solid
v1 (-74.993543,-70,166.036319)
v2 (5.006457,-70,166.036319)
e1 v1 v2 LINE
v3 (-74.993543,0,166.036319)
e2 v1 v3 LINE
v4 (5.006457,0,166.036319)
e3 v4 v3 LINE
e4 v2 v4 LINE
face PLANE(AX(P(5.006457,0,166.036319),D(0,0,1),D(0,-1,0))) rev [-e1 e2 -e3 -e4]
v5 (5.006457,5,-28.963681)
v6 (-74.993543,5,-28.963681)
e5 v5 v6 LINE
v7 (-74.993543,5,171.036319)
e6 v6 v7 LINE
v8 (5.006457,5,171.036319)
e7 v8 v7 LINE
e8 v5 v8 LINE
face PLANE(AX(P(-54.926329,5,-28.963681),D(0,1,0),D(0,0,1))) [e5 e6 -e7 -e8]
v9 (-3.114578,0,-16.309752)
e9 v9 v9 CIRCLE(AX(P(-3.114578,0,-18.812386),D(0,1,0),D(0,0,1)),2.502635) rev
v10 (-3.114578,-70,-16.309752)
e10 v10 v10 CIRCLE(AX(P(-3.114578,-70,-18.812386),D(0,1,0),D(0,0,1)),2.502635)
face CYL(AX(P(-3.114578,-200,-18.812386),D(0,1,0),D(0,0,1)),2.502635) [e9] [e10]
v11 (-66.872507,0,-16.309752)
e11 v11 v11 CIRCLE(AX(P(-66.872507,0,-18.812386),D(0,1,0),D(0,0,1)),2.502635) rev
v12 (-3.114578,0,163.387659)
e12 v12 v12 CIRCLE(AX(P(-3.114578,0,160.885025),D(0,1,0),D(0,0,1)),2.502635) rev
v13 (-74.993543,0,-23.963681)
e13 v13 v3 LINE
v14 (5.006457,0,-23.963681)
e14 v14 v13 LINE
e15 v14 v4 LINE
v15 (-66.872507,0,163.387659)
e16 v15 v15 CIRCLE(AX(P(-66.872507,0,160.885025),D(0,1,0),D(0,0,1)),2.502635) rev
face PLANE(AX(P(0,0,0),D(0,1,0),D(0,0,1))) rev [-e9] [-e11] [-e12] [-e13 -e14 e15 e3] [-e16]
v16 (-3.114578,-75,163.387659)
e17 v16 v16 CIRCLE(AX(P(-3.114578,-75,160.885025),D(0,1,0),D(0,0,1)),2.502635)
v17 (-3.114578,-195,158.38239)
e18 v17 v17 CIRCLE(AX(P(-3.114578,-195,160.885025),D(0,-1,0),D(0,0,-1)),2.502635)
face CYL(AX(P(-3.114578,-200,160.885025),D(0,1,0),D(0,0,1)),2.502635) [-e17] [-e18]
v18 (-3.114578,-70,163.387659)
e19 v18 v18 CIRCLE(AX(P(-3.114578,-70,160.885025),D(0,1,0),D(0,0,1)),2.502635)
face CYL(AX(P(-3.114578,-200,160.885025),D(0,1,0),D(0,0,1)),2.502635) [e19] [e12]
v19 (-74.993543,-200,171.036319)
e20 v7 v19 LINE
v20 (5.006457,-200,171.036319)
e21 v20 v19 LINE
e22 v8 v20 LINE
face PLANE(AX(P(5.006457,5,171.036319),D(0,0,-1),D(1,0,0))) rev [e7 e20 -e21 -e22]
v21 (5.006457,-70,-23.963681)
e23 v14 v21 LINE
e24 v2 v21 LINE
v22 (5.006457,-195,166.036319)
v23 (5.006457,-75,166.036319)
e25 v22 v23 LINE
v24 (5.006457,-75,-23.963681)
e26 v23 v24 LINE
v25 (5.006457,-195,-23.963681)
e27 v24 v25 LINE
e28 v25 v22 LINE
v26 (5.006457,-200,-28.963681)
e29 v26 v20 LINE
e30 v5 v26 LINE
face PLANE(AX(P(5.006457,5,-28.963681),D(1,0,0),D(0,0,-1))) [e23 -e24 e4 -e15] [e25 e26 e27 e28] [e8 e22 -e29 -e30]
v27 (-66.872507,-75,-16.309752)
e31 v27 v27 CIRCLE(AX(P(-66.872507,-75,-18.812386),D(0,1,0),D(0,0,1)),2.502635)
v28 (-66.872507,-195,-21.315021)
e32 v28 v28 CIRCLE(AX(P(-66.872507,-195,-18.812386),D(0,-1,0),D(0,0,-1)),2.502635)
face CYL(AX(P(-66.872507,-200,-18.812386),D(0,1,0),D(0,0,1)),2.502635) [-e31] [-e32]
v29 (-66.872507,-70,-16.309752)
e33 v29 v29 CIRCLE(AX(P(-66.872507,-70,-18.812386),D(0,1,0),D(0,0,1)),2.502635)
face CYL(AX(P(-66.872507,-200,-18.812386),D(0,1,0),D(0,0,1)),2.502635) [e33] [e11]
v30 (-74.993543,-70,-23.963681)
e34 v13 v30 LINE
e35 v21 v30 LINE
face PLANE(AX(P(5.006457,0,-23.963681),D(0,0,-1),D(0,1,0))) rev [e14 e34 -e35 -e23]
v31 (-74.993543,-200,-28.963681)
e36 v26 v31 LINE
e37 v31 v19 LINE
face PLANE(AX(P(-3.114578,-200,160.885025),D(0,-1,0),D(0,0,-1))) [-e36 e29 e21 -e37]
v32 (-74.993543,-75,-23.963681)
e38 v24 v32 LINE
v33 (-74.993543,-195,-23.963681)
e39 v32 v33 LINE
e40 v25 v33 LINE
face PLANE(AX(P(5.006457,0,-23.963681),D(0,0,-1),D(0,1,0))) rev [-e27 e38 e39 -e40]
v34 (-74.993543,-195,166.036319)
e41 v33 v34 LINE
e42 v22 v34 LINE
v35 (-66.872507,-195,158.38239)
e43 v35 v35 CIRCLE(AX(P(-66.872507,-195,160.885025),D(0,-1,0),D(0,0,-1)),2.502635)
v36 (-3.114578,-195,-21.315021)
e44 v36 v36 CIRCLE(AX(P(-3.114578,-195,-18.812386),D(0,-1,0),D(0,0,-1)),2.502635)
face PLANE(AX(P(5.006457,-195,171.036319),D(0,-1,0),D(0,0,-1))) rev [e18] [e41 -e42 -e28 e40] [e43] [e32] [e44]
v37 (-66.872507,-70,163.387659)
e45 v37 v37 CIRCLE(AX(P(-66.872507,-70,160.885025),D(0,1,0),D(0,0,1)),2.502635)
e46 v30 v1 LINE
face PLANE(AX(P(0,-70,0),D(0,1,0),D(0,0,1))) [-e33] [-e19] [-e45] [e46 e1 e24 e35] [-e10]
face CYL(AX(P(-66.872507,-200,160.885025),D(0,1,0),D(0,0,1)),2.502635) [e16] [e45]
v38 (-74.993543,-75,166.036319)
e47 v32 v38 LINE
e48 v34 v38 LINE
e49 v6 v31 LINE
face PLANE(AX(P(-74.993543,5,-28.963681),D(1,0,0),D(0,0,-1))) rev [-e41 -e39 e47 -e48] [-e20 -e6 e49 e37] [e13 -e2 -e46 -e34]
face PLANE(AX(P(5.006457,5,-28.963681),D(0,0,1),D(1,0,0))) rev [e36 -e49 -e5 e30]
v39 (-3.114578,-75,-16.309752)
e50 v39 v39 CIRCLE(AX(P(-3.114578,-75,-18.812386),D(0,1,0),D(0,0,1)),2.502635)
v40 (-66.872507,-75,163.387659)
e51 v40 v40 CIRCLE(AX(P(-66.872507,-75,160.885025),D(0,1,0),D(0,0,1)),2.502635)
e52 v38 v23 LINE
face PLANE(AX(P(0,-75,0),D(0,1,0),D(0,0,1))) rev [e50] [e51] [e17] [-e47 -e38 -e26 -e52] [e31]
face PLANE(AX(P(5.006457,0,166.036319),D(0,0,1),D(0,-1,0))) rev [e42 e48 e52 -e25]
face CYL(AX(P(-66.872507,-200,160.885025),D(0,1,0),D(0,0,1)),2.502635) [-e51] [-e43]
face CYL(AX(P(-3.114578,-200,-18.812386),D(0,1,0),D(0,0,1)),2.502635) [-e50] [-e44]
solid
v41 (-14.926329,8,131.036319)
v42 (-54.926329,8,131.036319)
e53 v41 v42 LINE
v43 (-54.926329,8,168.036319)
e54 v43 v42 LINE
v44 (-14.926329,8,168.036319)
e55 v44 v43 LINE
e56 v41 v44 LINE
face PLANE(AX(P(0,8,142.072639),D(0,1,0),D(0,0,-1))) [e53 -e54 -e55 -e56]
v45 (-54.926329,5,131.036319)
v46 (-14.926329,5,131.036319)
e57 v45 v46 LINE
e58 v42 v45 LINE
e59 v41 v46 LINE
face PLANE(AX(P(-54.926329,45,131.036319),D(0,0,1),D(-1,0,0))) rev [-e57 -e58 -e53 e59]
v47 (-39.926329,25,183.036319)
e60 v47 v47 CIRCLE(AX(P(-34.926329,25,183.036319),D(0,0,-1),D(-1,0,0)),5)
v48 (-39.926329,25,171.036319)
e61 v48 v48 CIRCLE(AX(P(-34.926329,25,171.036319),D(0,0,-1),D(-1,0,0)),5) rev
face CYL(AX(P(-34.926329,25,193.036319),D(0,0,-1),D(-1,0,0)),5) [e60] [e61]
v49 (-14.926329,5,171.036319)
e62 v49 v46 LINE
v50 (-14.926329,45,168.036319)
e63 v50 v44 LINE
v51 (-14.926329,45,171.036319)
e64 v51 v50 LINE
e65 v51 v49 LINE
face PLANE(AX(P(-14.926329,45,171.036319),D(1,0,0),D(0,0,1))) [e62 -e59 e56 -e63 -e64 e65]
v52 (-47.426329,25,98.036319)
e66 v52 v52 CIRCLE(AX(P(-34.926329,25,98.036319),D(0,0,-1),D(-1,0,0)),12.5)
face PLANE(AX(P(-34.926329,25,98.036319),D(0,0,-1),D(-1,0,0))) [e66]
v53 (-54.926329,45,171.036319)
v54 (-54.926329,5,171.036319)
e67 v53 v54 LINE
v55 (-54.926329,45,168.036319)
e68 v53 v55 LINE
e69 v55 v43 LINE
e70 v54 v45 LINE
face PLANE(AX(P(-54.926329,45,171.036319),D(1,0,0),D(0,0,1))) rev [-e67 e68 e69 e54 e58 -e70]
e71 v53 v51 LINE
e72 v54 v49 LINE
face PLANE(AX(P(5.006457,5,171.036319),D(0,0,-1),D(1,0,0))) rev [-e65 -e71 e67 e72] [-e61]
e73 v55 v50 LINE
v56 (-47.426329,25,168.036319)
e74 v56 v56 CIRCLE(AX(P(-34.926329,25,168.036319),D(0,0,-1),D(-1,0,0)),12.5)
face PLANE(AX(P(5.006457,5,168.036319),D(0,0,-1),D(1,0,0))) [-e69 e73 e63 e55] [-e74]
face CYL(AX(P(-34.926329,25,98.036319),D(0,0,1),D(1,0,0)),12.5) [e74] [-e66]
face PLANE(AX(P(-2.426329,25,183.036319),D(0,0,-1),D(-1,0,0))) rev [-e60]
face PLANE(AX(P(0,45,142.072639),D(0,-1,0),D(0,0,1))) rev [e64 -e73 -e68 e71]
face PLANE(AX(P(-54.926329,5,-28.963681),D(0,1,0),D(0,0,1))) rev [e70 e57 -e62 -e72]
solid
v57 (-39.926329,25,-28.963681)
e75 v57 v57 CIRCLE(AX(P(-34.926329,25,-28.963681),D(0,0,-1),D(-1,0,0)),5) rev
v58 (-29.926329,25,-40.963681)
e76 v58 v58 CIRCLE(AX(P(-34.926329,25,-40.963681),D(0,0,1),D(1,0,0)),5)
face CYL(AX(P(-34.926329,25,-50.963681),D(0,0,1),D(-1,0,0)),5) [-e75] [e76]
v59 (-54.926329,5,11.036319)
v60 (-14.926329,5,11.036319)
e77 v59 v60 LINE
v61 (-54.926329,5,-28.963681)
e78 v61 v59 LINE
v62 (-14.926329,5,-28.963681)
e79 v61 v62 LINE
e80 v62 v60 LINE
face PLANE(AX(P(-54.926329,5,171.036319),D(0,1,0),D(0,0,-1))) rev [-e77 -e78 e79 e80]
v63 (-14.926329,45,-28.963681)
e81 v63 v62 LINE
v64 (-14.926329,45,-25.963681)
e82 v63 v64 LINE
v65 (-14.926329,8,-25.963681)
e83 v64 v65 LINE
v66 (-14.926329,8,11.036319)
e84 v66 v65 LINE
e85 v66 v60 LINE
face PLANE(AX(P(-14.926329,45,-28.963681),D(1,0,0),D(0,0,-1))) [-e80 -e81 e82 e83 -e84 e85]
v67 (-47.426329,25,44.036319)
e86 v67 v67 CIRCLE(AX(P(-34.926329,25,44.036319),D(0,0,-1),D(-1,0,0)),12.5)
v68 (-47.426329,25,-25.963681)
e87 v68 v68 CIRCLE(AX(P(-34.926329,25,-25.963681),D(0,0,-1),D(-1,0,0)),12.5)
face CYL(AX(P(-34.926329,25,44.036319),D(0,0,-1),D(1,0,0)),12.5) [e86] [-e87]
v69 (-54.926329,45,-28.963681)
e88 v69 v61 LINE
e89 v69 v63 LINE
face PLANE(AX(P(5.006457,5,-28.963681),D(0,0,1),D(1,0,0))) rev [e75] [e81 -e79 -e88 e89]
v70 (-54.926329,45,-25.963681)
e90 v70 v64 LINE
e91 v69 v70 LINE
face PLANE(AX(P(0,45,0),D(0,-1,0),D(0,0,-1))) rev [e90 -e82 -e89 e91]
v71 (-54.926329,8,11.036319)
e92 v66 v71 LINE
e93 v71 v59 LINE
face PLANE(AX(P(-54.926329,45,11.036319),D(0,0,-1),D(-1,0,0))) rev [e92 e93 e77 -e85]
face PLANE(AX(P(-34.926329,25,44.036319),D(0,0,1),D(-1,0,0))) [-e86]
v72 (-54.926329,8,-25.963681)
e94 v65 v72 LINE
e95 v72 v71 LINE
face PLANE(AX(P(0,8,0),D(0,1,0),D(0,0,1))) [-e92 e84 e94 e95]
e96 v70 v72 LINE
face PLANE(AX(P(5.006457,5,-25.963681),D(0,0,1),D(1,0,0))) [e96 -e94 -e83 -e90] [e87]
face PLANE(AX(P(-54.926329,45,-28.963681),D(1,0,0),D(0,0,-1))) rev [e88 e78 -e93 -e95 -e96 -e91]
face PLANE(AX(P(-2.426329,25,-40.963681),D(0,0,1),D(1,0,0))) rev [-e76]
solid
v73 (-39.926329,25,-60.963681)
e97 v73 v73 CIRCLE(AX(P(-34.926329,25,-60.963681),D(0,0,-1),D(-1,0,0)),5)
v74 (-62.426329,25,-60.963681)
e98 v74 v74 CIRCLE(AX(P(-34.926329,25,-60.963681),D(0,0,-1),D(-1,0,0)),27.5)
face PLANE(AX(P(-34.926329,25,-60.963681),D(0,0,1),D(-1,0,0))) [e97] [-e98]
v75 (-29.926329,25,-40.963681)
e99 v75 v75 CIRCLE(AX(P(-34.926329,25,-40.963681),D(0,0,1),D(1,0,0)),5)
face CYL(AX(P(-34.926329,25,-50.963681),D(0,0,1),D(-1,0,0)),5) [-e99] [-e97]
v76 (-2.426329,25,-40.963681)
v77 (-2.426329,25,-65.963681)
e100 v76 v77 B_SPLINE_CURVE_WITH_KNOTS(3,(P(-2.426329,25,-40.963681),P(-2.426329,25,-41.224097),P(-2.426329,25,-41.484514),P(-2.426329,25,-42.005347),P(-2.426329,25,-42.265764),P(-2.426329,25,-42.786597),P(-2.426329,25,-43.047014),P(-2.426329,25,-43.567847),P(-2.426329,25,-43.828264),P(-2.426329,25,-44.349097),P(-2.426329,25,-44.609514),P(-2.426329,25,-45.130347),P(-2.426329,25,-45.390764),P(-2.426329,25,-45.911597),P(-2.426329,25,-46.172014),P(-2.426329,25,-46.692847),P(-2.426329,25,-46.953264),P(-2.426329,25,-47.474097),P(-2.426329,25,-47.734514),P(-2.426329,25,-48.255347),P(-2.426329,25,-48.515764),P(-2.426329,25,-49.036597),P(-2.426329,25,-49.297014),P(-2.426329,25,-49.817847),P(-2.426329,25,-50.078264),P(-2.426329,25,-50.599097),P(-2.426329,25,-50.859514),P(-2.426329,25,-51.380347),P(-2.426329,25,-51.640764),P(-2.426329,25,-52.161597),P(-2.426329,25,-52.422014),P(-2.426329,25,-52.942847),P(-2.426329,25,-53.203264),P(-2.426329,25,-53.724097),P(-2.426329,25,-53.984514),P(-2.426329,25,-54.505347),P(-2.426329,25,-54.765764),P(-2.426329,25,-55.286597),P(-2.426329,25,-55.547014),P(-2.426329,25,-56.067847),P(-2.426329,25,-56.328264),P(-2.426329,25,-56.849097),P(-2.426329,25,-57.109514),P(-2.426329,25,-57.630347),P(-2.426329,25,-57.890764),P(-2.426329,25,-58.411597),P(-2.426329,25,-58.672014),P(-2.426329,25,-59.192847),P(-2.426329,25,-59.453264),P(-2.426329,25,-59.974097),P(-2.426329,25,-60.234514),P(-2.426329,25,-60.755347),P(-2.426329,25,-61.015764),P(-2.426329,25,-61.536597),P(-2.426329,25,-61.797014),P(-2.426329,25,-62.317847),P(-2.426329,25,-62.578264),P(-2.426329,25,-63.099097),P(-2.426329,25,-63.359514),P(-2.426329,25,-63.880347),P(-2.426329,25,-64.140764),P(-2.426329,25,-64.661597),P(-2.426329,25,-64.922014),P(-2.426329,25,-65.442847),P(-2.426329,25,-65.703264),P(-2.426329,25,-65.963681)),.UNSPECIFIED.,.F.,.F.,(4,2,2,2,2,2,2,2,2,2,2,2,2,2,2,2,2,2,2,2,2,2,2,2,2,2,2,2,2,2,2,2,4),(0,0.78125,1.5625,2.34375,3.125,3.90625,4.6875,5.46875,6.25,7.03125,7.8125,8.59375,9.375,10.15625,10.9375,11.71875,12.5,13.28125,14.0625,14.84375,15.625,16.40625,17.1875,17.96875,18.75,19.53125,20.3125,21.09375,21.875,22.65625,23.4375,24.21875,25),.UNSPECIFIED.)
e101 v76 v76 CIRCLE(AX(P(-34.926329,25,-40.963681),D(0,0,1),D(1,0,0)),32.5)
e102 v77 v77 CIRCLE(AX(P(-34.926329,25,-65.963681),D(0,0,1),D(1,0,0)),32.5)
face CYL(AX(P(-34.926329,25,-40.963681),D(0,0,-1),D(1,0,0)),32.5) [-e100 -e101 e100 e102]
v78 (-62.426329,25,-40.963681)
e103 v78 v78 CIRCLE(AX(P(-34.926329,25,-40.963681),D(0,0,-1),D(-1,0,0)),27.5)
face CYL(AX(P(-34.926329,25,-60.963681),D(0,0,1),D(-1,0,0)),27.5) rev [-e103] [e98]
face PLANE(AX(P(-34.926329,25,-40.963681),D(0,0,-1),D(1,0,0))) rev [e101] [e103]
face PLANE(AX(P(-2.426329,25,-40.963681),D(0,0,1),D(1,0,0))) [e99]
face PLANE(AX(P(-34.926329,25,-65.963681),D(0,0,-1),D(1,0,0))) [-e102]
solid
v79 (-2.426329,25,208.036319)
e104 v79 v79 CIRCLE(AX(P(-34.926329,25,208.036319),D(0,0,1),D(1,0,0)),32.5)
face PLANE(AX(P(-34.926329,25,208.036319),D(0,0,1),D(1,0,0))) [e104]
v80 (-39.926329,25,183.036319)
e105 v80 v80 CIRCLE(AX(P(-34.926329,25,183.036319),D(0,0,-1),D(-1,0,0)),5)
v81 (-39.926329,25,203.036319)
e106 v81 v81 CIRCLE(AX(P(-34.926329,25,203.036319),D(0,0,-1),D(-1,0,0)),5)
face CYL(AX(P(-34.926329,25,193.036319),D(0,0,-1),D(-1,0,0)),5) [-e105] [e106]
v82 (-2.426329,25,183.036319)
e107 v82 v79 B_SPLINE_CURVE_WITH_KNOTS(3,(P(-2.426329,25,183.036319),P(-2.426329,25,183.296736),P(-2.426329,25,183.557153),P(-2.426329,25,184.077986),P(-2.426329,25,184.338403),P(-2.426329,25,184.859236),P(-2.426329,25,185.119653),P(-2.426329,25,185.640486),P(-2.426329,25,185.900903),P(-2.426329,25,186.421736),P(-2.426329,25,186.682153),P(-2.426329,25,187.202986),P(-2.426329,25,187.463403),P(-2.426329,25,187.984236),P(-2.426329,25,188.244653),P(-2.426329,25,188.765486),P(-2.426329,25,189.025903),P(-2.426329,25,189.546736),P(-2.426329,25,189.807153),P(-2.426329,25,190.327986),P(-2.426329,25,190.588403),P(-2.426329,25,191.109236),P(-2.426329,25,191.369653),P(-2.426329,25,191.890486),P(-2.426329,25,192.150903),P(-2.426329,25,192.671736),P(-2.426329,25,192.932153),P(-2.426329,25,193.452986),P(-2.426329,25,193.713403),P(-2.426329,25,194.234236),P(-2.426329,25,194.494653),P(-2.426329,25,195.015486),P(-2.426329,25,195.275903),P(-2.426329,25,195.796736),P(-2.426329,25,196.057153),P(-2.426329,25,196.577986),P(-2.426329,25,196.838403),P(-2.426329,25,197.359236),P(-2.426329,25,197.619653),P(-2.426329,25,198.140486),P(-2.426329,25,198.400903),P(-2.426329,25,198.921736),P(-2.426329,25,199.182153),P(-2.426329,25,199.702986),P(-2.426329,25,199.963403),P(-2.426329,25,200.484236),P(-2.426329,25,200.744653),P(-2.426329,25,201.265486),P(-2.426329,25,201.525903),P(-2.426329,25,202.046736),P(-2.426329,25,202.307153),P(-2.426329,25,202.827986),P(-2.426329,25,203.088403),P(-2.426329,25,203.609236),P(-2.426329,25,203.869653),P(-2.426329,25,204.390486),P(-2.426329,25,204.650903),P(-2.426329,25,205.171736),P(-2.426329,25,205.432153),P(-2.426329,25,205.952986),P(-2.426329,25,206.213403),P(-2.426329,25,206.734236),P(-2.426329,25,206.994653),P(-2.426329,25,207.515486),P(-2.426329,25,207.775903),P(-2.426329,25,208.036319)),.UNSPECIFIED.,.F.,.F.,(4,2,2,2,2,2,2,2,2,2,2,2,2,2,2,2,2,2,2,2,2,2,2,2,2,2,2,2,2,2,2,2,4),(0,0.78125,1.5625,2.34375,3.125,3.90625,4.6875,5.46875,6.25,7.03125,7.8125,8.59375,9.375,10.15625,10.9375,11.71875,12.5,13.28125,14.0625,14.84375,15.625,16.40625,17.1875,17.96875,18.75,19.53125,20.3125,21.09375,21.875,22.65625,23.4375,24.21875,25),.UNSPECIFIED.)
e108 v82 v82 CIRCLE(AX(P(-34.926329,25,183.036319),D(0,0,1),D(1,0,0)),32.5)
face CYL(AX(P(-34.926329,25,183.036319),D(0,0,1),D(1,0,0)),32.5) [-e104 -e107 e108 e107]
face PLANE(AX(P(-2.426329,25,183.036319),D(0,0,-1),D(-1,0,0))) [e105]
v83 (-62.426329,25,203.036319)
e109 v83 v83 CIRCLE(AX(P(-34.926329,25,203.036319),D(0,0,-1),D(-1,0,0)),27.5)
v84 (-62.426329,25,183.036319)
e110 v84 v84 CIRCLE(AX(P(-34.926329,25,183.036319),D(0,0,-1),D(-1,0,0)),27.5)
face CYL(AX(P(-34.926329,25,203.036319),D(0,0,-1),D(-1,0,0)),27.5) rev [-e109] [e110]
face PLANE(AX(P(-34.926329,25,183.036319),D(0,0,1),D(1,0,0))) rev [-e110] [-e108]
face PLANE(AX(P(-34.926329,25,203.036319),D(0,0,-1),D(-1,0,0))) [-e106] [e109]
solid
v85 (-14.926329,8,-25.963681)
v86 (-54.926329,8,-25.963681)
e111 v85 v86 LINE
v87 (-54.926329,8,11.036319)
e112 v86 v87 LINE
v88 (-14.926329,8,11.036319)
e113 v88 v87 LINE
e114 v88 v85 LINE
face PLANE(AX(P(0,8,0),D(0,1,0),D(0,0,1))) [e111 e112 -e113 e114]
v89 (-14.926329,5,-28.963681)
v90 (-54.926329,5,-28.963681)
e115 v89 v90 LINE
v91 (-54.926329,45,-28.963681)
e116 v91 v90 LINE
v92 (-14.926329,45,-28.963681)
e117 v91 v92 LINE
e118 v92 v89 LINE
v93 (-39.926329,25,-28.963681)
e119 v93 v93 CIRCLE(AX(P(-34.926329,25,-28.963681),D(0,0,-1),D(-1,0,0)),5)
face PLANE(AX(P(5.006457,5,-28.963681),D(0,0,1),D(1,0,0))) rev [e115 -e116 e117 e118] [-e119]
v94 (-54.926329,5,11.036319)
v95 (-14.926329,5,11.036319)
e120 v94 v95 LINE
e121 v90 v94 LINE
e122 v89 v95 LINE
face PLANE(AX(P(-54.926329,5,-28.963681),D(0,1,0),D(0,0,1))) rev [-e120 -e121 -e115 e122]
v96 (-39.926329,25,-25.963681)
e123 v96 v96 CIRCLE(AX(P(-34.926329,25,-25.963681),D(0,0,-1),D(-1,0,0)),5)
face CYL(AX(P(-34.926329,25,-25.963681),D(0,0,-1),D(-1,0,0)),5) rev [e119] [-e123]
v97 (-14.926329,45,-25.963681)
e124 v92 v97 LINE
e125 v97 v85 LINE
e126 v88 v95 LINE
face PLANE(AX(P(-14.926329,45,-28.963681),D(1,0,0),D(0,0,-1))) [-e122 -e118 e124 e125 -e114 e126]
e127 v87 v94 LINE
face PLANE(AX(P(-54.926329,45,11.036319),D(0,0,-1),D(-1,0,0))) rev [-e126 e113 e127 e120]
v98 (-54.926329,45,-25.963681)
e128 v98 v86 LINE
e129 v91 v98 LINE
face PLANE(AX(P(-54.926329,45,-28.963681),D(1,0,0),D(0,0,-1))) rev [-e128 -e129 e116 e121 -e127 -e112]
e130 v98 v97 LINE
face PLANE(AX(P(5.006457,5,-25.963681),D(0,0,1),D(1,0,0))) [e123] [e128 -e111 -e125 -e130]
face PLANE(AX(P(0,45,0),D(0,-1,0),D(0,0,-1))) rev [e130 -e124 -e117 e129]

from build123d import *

# Parameters (mm, degrees)
SKETCH1_W            = 80
SKETCH1_H            = 100
BOSS_EXTRUDE1_DEPTH  = 5
SKETCH2_W            = 40
SKETCH2_H            = 40
BOSS_EXTRUDE2_DEPTH  = 40
SHELL2_START         = -25.963680664
SHELL2_OUTLINE_W     = 40
SHELL2_OUTLINE_H     = 37
SHELL2_DEPTH         = 37
SKETCH4_R            = 5
CUT_EXTRUDE2_DEPTH   = 3
SPLIT1_START         = 5
SPLIT1_OUTLINE_W     = 40
SPLIT1_OUTLINE_H     = 40
SPLIT1_DEPTH         = 40
SPLIT1_START_2       = -28.963680664
SPLIT1_2_OUTLINE_W   = 40
SPLIT1_2_OUTLINE_H   = 3
SPLIT1_2_DEPTH       = 40
SPLIT1_3_OUTLINE_W   = 40
SPLIT1_3_OUTLINE_H   = 37
SPLIT1_3_OUTLINE_R   = 5
SPLIT1_3_DEPTH       = 3
SPLIT1_START_3       = 131.036319336
SPLIT1_4_OUTLINE_W   = 40
SPLIT1_4_OUTLINE_H   = 3
SPLIT1_4_DEPTH       = 40
SPLIT1_START_4       = 168.036319336
SPLIT1_5_OUTLINE_W   = 40
SPLIT1_5_OUTLINE_H   = 37
SPLIT1_5_OUTLINE_R   = 5
SPLIT1_5_DEPTH       = 3
SKETCH7_R            = 12.5
BOSS_EXTRUDE3_DEPTH  = 70
SKETCH8_R            = 5
BOSS_EXTRUDE4_DEPTH  = 25
SKETCH9_R            = 32.5
BOSS_EXTRUDE9_DEPTH  = 10
SKETCH13_R           = 32.5
BOSS_EXTRUDE10_DEPTH = 15
SKETCH14_R           = 27.5
SKETCH14_R_2         = 5
CUT_EXTRUDE4_DEPTH   = 20
SPLIT2_START         = -65.963680664
SPLIT2_OUTLINE_R     = 32.5
SPLIT2_OUTLINE_R_2   = 27.5
SPLIT2_OUTLINE_R_3   = 5
SPLIT2_DEPTH         = 25
SPLIT2_2_OUTLINE_R   = 27.5
SPLIT2_2_OUTLINE_R_2 = 5
SPLIT2_2_DEPTH       = 5
SPLIT2_3_OUTLINE_R   = 32.5
SPLIT2_3_DEPTH       = 25
SPLIT2_START_2       = 183.036319336
SPLIT2_4_OUTLINE_R   = 32.5
SPLIT2_4_OUTLINE_R_2 = 27.5
SPLIT2_4_OUTLINE_R_3 = 5
SPLIT2_4_DEPTH       = 25
SPLIT2_START_3       = 203.036319336
SPLIT2_5_OUTLINE_R   = 27.5
SPLIT2_5_OUTLINE_R_2 = 5
SPLIT2_5_DEPTH       = 5
SPLIT2_6_OUTLINE_R   = 32.5
SPLIT2_6_DEPTH       = 25
SKETCH18_R           = 2.502634572
BOSS_EXTRUDE11_DEPTH = 200
EXTRUDE_THIN2_DEPTH  = 80
BOSS_EXTRUDE21_START = 120
SKETCH45_W           = 80
SKETCH45_H           = 190
BOSS_EXTRUDE21_DEPTH = 5


# Read off the part's stored shape, not the designer's step: Shell2, Split1, Split2
with BuildPart() as part:
    # Sketch1 → Boss-Extrude1 (new body)
    with BuildSketch(Plane(origin=(0, 0, 0), x_dir=(1, 0, 0), z_dir=(0, 1, 0))):
        with Locations((-34.993542676, -21.036319336)):
            Rectangle(SKETCH1_W, SKETCH1_H)
    extrude(amount=BOSS_EXTRUDE1_DEPTH)

    # Sketch2 → Boss-Extrude2 (add)
    with BuildSketch(Plane(origin=(0, 5, 0), x_dir=(1, 0, 0), z_dir=(0, 1, 0))):
        with Locations((-34.926329237, 8.963680664)):
            Rectangle(SKETCH2_W, SKETCH2_H)
    extrude(amount=BOSS_EXTRUDE2_DEPTH)

    # Shell2 outline → Shell2 (cut)
    with BuildSketch(Plane.XY.offset(SHELL2_START)):
        with Locations((-34.926329237, 26.5)):
            Rectangle(SHELL2_OUTLINE_W, SHELL2_OUTLINE_H)
    extrude(amount=SHELL2_DEPTH, mode=Mode.SUBTRACT)

    # Sketch4 → Cut-Extrude2 (cut)
    with BuildSketch(Plane(origin=(0, 0, -28.963680664), x_dir=(-1, 0, 0), z_dir=(0, 0, -1))):
        with Locations((34.926329237, 25)):
            Circle(SKETCH4_R)
    extrude(amount=-CUT_EXTRUDE2_DEPTH, mode=Mode.SUBTRACT)

    # Mirror1: part across plane


with BuildPart() as part_1:
    add(part.part)
    add(part.part.mirror(Plane.XY.offset(71.036319336)))

    # Split1 outline → Split1 (cut)
    with BuildSketch(Plane(origin=(0, 0, 0), x_dir=(1, 0, 0), z_dir=(0, 1, 0)).offset(SPLIT1_START)):
        with Locations((-34.926329237, 8.963680664)):
            Rectangle(SPLIT1_OUTLINE_W, SPLIT1_OUTLINE_H)
        with Locations((-34.926329237, -151.036319336)):
            Rectangle(SPLIT1_OUTLINE_W, SPLIT1_OUTLINE_H)
    extrude(amount=SPLIT1_DEPTH, mode=Mode.SUBTRACT)

    # Sketch18 → Boss-Extrude11 (add)
    with BuildSketch(Plane(origin=(0, 0, 0), x_dir=(-1, 0, 0), z_dir=(0, -1, 0))):
        with Locations(Location((3.114578294, -160.885024814, 0), (0, 0, 270))):
            Circle(SKETCH18_R)
        with Locations(Location((3.114578294, 18.812386141, 0), (0, 0, 270))):
            Circle(SKETCH18_R)
        with Locations(Location((66.872507057, 18.812386141, 0), (0, 0, 270))):
            Circle(SKETCH18_R)
        with Locations(Location((66.872507057, -160.885024814, 0), (0, 0, 270))):
            Circle(SKETCH18_R)
    extrude(amount=BOSS_EXTRUDE11_DEPTH)

    # Sketch20 → Extrude-Thin2 (add, through all)
    with BuildSketch(Plane.ZY.offset(74.993542676)):
        Polygon((171.036319336, 0), (171.036319336, -200), (-28.963680664, -200), (-28.963680664, 0), (-23.963680664, 0), (-23.963680664, -195), (166.036319336, -195), (166.036319336, 0), align=None)
    extrude(amount=-EXTRUDE_THIN2_DEPTH)

    # Sketch45 → Boss-Extrude21 (add)
    with BuildSketch(Plane(origin=(0, -195, 0), x_dir=(1, 0, 0), z_dir=(0, 1, 0)).offset(BOSS_EXTRUDE21_START)):
        with Locations((-34.993542676, -71.036319336)):
            Rectangle(SKETCH45_W, SKETCH45_H)
    extrude(amount=BOSS_EXTRUDE21_DEPTH)


with BuildPart() as body_2:
    # Split1 2 outline → Split1 2 (new body)
    with BuildSketch(Plane.XY.offset(SPLIT1_START_2)):
        with Locations((-34.926329237, 6.5)):
            Rectangle(SPLIT1_2_OUTLINE_W, SPLIT1_2_OUTLINE_H)
    extrude(amount=SPLIT1_2_DEPTH)

    # Split1 3 outline → Split1 3 (add)
    with BuildSketch(Plane.XY.offset(SPLIT1_START_2)):
        with Locations((-34.926329237, 26.5)):
            Rectangle(SPLIT1_3_OUTLINE_W, SPLIT1_3_OUTLINE_H)
        with Locations((-34.926329237, 25)):
            Circle(SPLIT1_3_OUTLINE_R, mode=Mode.SUBTRACT)
    extrude(amount=SPLIT1_3_DEPTH)


with BuildPart() as body_3:
    # Split1 4 outline → Split1 4 (new body)
    with BuildSketch(Plane.XY.offset(SPLIT1_START_3)):
        with Locations((-34.926329237, 6.5)):
            Rectangle(SPLIT1_4_OUTLINE_W, SPLIT1_4_OUTLINE_H)
    extrude(amount=SPLIT1_4_DEPTH)

    # Split1 5 outline → Split1 5 (add)
    with BuildSketch(Plane.XY.offset(SPLIT1_START_4)):
        with Locations((-34.926329237, 26.5)):
            Rectangle(SPLIT1_5_OUTLINE_W, SPLIT1_5_OUTLINE_H)
        with Locations((-34.926329237, 25)):
            Circle(SPLIT1_5_OUTLINE_R, mode=Mode.SUBTRACT)
    extrude(amount=SPLIT1_5_DEPTH)

    # Sketch7 → Boss-Extrude3 (add)
    with BuildSketch(Plane(origin=(0, 0, 168.036319336), x_dir=(-1, 0, 0), z_dir=(0, 0, -1))):
        with Locations((34.926329237, 25)):
            Circle(SKETCH7_R)
    extrude(amount=BOSS_EXTRUDE3_DEPTH)

    # Sketch8 → Boss-Extrude4 (add)
    with BuildSketch(Plane.XY.offset(168.036319336)):
        with Locations(Location((-34.926329237, 25, 0), (0, 0, 180))):
            Circle(SKETCH8_R)
    extrude(amount=BOSS_EXTRUDE4_DEPTH)

    # Sketch9 → Boss-Extrude9 (add)
    with BuildSketch(Plane.XY.offset(193.036319336)):
        with Locations((-34.926329237, 25)):
            Circle(SKETCH9_R)
    extrude(amount=-BOSS_EXTRUDE9_DEPTH)

    # Sketch13 → Boss-Extrude10 (add)
    with BuildSketch(Plane.XY.offset(193.036319336)):
        with Locations((-34.926329237, 25)):
            Circle(SKETCH13_R)
    extrude(amount=BOSS_EXTRUDE10_DEPTH)

    # Sketch14 → Cut-Extrude4 (cut)
    with BuildSketch(Plane(origin=(0, 0, 183.036319336), x_dir=(-1, 0, 0), z_dir=(0, 0, -1))):
        with Locations((34.926329237, 25)):
            Circle(SKETCH14_R)
        with Locations((34.926329237, 25)):
            Circle(SKETCH14_R_2, mode=Mode.SUBTRACT)
    extrude(amount=-CUT_EXTRUDE4_DEPTH, mode=Mode.SUBTRACT)


with BuildPart() as body_4:
    # Mirror2: mirrored copy
    add(body_3.part.mirror(Plane.XY.offset(71.036319336)))

    # Split2 3 outline → Split2 3 (cut)
    with BuildSketch(Plane.XY.offset(SPLIT2_START)):
        with Locations((-34.926329237, 25)):
            Circle(SPLIT2_3_OUTLINE_R)
    extrude(amount=SPLIT2_3_DEPTH, mode=Mode.SUBTRACT)


with BuildPart() as body_5:
    # Split2 outline → Split2 (new body)
    # profile 1 of 2: a face of its own
    with BuildSketch(Plane.XY.offset(SPLIT2_START)):
        with Locations((-34.926329237, 25)):
            Circle(SPLIT2_OUTLINE_R)
        with Locations((-34.926329237, 25)):
            Circle(SPLIT2_OUTLINE_R_2, mode=Mode.SUBTRACT)
    # profile 2 of 2: a face of its own
    with BuildSketch(Plane.XY.offset(SPLIT2_START)):
        with Locations((-34.926329237, 25)):
            Circle(SPLIT2_OUTLINE_R_3)
    extrude(amount=SPLIT2_DEPTH)

    # Split2 2 outline → Split2 2 (add)
    with BuildSketch(Plane.XY.offset(SPLIT2_START)):
        with Locations((-34.926329237, 25)):
            Circle(SPLIT2_2_OUTLINE_R)
        with Locations((-34.926329237, 25)):
            Circle(SPLIT2_2_OUTLINE_R_2, mode=Mode.SUBTRACT)
    extrude(amount=SPLIT2_2_DEPTH)


with BuildPart() as body_6:
    # Split2 4 outline → Split2 4 (new body)
    # profile 1 of 2: a face of its own
    with BuildSketch(Plane.XY.offset(SPLIT2_START_2)):
        with Locations((-34.926329237, 25)):
            Circle(SPLIT2_4_OUTLINE_R)
        with Locations((-34.926329237, 25)):
            Circle(SPLIT2_4_OUTLINE_R_2, mode=Mode.SUBTRACT)
    # profile 2 of 2: a face of its own
    with BuildSketch(Plane.XY.offset(SPLIT2_START_2)):
        with Locations((-34.926329237, 25)):
            Circle(SPLIT2_4_OUTLINE_R_3)
    extrude(amount=SPLIT2_4_DEPTH)

    # Split2 5 outline → Split2 5 (add)
    with BuildSketch(Plane.XY.offset(SPLIT2_START_3)):
        with Locations((-34.926329237, 25)):
            Circle(SPLIT2_5_OUTLINE_R)
        with Locations((-34.926329237, 25)):
            Circle(SPLIT2_5_OUTLINE_R_2, mode=Mode.SUBTRACT)
    extrude(amount=SPLIT2_5_DEPTH)


with BuildPart() as body_3_1:
    add(body_3.part)

    # Split2 6 outline → Split2 6 (cut)
    with BuildSketch(Plane.XY.offset(SPLIT2_START_2)):
        with Locations((-34.926329237, 25)):
            Circle(SPLIT2_6_OUTLINE_R)
    extrude(amount=SPLIT2_6_DEPTH, mode=Mode.SUBTRACT)


solid = Compound([part_1.part, body_2.part, body_4.part, body_5.part, body_6.part, body_3_1.part])
